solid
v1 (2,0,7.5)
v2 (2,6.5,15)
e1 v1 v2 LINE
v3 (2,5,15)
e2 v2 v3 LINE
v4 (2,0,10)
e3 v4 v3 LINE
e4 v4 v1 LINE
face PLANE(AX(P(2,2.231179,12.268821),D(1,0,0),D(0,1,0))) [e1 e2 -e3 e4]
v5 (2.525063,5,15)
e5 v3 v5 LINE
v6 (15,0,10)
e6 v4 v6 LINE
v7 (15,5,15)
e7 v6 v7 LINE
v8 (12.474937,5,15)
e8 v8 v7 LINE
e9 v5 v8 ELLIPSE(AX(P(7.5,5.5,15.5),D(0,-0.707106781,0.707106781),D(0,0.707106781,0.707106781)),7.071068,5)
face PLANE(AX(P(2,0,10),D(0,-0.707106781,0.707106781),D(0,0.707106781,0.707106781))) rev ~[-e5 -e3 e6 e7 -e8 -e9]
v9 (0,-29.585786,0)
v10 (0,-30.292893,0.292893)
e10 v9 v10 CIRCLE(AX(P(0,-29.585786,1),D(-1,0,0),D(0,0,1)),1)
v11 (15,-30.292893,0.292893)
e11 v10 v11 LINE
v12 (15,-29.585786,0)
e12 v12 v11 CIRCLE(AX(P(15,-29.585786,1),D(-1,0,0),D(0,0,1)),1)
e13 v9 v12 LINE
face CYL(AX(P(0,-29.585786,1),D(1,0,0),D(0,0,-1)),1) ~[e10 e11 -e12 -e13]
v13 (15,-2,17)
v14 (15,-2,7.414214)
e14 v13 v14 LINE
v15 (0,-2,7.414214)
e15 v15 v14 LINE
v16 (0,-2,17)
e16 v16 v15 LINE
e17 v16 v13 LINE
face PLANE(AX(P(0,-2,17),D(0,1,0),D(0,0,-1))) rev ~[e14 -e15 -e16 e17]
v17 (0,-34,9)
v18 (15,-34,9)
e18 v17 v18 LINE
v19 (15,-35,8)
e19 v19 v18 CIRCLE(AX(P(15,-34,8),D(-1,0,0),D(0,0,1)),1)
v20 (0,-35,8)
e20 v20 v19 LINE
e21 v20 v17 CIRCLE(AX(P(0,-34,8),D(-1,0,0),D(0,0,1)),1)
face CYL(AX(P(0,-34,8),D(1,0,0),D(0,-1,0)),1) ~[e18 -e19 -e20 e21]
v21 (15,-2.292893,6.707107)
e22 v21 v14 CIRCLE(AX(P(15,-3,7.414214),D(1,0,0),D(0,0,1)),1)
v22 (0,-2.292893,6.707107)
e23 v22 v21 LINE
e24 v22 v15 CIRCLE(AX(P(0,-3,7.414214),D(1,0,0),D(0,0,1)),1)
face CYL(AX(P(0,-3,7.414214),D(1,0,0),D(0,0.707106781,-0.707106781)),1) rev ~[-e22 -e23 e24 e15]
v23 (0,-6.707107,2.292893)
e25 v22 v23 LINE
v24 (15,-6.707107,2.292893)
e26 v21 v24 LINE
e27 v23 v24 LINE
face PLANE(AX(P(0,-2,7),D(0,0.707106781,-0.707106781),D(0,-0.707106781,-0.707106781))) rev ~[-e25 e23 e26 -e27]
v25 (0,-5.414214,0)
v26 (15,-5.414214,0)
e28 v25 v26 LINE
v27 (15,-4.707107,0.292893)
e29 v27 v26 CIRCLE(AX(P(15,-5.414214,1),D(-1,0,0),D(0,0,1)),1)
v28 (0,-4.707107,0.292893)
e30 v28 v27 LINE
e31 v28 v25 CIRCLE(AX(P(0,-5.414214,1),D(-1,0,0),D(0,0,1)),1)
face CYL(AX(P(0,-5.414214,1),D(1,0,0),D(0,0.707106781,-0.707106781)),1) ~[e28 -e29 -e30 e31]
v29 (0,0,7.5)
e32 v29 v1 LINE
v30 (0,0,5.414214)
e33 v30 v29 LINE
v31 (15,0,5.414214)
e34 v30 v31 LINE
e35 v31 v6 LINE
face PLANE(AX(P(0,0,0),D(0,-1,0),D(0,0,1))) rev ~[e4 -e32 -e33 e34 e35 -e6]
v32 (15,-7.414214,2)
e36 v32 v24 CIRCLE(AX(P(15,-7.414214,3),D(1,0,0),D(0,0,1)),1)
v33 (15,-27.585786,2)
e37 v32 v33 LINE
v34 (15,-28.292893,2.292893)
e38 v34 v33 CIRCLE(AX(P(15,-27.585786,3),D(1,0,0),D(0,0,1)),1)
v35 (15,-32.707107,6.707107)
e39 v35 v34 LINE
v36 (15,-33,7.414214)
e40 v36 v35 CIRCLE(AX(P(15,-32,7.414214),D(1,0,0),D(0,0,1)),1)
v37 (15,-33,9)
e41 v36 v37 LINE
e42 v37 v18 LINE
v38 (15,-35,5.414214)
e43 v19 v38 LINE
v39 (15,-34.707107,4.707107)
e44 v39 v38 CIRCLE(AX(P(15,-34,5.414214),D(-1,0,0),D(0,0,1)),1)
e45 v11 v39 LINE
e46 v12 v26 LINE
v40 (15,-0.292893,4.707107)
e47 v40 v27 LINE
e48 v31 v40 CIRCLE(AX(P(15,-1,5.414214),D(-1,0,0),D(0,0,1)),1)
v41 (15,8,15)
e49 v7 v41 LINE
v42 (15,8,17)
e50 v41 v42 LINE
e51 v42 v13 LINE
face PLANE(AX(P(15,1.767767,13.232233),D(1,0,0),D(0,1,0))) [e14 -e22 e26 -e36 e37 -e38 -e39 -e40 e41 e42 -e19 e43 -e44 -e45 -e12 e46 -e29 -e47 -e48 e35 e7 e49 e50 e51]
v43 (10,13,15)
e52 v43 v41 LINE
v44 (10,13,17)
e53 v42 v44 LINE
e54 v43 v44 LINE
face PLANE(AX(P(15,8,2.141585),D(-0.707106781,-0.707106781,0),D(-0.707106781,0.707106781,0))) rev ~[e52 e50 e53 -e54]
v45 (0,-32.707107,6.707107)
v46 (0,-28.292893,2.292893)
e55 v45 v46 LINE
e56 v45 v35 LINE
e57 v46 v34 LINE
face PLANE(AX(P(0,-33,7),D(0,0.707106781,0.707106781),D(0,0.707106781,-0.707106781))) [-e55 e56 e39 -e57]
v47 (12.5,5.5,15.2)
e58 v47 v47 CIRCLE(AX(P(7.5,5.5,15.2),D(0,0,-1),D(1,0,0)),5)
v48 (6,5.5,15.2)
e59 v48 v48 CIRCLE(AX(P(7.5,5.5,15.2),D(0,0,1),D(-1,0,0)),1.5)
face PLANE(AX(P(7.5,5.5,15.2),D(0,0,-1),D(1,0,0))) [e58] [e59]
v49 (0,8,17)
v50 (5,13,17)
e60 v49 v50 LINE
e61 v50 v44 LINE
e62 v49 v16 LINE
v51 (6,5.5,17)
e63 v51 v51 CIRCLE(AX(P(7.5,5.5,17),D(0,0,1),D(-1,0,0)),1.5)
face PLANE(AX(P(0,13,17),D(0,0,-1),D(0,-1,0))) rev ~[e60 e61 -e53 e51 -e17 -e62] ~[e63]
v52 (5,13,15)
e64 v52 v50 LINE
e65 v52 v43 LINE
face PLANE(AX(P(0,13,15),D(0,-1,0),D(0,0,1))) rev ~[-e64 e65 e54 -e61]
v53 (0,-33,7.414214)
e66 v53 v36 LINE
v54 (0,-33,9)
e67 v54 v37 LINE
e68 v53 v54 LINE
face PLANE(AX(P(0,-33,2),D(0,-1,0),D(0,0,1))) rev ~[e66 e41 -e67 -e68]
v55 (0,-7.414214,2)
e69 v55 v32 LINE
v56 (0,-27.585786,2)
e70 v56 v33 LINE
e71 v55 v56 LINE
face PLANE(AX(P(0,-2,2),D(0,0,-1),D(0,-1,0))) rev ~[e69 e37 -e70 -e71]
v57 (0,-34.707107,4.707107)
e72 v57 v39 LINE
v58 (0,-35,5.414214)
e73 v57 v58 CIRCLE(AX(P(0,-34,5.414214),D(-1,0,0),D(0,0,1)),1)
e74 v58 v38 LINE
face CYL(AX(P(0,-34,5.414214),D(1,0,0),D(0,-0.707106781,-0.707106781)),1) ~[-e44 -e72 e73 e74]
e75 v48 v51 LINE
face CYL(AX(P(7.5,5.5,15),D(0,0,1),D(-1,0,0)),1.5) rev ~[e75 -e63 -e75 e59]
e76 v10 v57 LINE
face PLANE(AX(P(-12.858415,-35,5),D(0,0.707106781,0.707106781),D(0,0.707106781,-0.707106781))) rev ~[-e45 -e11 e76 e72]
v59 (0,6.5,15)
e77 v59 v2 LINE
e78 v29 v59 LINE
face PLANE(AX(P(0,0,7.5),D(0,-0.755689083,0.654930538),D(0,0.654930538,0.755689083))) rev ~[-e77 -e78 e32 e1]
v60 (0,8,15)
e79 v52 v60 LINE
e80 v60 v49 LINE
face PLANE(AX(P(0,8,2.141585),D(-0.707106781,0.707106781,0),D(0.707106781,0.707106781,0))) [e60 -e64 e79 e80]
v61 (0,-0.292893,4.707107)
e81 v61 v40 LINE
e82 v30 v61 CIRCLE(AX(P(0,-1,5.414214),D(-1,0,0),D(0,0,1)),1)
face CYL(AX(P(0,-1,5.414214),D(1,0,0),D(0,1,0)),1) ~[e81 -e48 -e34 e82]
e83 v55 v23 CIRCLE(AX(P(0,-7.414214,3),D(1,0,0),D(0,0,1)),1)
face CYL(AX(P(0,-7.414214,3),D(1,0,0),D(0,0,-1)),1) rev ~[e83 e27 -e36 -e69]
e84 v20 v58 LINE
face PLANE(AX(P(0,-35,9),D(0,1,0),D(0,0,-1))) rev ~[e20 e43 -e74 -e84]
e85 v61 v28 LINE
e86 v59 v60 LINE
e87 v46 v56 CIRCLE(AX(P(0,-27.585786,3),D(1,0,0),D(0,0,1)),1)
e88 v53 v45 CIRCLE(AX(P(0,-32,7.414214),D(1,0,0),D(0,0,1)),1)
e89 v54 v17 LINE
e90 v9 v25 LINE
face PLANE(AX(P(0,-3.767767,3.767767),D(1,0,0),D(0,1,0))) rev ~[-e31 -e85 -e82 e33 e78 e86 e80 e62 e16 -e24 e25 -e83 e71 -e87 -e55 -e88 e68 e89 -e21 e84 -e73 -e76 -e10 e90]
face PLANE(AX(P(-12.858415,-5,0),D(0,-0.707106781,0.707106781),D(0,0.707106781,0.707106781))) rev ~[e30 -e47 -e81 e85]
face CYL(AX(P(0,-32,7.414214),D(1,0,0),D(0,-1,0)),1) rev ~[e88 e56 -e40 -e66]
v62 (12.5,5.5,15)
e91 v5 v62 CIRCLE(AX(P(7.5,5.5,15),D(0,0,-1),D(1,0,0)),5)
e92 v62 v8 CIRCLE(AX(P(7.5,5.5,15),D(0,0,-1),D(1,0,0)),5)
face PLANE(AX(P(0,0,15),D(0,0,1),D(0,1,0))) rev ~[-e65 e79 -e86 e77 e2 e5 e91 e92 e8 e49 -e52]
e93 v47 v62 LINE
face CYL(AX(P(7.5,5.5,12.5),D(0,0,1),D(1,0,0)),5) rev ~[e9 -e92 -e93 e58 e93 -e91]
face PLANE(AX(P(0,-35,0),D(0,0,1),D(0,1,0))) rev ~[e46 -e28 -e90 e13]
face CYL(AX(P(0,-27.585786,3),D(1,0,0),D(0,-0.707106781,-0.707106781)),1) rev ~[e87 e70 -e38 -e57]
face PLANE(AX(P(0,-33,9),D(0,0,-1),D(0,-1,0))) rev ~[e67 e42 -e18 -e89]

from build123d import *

# Parameters (mm, degrees)
F1_DEPTH       = 15
F2_DEPTH       = 2
F4_D           = 3
F4_DEPTH       = 100
F4_CBORE_D     = 10
F4_CBORE_DEPTH = 0.2
F4_TIP         = 0.9012909285
F5_T1_DEPTH    = 15
F5_T6_DEPTH    = 13
F5_S7_R        = 5
F5_T8_DEPTH    = 9
F5_T9_DEPTH    = 40.7168298797
F5_T11_DEPTH   = 27.7168298797
F6_R           = 1


# Not quite as in the source:
# - a fillet or chamfer that OpenCascade refuses, or shapes differently, is made with other operations: its cross-section is extruded or revolved along the edge and cut away or added


with BuildPart() as f1:
    # F0 (on Right) → F1 (new body)
    with BuildSketch(Plane.YZ):
        Polygon((-35, 9), (-35, 0), (0, 0), (0, 7.5), (0, 15), (6.5, 15), (13, 15), (13, 17), (-2, 17), (-2, 2), (-33, 2), (-33, 9), align=None)
    extrude(amount=F1_DEPTH)

    # F0 (on Right) → F2 (join)
    with BuildSketch(Plane.YZ):
        Polygon((0, 15), (0, 7.5), (6.5, 15), align=None)
    extrude(amount=F2_DEPTH)

    # F4
    with Locations(Plane(origin=(0, 0, 15), x_dir=(1, 0, 0), z_dir=(0, 0, -1))):
        with Locations((7.5, -5.5)):
            CounterBoreHole(F4_D / 2, F4_CBORE_D / 2, F4_CBORE_DEPTH, depth=F4_DEPTH)
            with Locations((0, 0, -(F4_DEPTH + F4_TIP / 2))):  # 118° drill point
                Cone(0, F4_D / 2, F4_TIP, mode=Mode.SUBTRACT)

    # F5: chamfer of 5 on 7 edges, made by hand

    # F5_s2 → F5_t1 (join)
    with BuildSketch(Plane.YZ):
        Polygon((-2, 7), (-7, 2), (-2, 2), align=None)
        Polygon((-33, 7), (-28, 2), (-33, 2), align=None)
    extrude(amount=F5_T1_DEPTH)


with BuildPart() as f5_tool4:
    # F5_s5 → F5_t6 (new body)
    with BuildSketch(Plane.YZ.offset(2)):
        Polygon((0, 10), (5, 15), (0, 15), align=None)
    extrude(amount=F5_T6_DEPTH)

    # F5_s7 → F5_t8 (cut, symmetric)
    with BuildSketch(Plane.XY.offset(12.5)):
        with Locations((7.5, 5.5)):
            Circle(F5_S7_R)
    extrude(amount=F5_T8_DEPTH, both=True, mode=Mode.SUBTRACT)


with BuildPart() as f1_1:
    add(f1.part)

    # F5_t3: union F5_tool4
    add(f5_tool4.part)

    # F5_s10 → F5_t9 (cut)
    with BuildSketch(Plane.YZ.offset(-12.8584149398)):
        Polygon((-35, 5), (-30, 0), (-35, 0), align=None)
        Polygon((-5, 0), (0, 5), (0, 0), align=None)
    extrude(amount=F5_T9_DEPTH, mode=Mode.SUBTRACT)

    # F5_s12 → F5_t11 (cut)
    with BuildSketch(Plane.XY.offset(2.1415850602)):
        Polygon((15, 8), (10, 13), (15, 13), align=None)
        Polygon((0, 8), (5, 13), (0, 13), align=None)
    extrude(amount=F5_T11_DEPTH, mode=Mode.SUBTRACT)

    # F6
    f6_edges = [f1_1.edges().sort_by_distance(p)[0] for p in [
        (7.5, -35, 9),
        (7.5, 0, 5),
        (7.5, -5, 0),
        (7.5, -30, 0),
        (7.5, -35, 5),
        (7.5, -33, 7),
        (7.5, -28, 2),
        (7.5, -7, 2),
        (7.5, -2, 7),
    ]]
    fillet(f6_edges, radius=F6_R)


solid = f1_1.part
